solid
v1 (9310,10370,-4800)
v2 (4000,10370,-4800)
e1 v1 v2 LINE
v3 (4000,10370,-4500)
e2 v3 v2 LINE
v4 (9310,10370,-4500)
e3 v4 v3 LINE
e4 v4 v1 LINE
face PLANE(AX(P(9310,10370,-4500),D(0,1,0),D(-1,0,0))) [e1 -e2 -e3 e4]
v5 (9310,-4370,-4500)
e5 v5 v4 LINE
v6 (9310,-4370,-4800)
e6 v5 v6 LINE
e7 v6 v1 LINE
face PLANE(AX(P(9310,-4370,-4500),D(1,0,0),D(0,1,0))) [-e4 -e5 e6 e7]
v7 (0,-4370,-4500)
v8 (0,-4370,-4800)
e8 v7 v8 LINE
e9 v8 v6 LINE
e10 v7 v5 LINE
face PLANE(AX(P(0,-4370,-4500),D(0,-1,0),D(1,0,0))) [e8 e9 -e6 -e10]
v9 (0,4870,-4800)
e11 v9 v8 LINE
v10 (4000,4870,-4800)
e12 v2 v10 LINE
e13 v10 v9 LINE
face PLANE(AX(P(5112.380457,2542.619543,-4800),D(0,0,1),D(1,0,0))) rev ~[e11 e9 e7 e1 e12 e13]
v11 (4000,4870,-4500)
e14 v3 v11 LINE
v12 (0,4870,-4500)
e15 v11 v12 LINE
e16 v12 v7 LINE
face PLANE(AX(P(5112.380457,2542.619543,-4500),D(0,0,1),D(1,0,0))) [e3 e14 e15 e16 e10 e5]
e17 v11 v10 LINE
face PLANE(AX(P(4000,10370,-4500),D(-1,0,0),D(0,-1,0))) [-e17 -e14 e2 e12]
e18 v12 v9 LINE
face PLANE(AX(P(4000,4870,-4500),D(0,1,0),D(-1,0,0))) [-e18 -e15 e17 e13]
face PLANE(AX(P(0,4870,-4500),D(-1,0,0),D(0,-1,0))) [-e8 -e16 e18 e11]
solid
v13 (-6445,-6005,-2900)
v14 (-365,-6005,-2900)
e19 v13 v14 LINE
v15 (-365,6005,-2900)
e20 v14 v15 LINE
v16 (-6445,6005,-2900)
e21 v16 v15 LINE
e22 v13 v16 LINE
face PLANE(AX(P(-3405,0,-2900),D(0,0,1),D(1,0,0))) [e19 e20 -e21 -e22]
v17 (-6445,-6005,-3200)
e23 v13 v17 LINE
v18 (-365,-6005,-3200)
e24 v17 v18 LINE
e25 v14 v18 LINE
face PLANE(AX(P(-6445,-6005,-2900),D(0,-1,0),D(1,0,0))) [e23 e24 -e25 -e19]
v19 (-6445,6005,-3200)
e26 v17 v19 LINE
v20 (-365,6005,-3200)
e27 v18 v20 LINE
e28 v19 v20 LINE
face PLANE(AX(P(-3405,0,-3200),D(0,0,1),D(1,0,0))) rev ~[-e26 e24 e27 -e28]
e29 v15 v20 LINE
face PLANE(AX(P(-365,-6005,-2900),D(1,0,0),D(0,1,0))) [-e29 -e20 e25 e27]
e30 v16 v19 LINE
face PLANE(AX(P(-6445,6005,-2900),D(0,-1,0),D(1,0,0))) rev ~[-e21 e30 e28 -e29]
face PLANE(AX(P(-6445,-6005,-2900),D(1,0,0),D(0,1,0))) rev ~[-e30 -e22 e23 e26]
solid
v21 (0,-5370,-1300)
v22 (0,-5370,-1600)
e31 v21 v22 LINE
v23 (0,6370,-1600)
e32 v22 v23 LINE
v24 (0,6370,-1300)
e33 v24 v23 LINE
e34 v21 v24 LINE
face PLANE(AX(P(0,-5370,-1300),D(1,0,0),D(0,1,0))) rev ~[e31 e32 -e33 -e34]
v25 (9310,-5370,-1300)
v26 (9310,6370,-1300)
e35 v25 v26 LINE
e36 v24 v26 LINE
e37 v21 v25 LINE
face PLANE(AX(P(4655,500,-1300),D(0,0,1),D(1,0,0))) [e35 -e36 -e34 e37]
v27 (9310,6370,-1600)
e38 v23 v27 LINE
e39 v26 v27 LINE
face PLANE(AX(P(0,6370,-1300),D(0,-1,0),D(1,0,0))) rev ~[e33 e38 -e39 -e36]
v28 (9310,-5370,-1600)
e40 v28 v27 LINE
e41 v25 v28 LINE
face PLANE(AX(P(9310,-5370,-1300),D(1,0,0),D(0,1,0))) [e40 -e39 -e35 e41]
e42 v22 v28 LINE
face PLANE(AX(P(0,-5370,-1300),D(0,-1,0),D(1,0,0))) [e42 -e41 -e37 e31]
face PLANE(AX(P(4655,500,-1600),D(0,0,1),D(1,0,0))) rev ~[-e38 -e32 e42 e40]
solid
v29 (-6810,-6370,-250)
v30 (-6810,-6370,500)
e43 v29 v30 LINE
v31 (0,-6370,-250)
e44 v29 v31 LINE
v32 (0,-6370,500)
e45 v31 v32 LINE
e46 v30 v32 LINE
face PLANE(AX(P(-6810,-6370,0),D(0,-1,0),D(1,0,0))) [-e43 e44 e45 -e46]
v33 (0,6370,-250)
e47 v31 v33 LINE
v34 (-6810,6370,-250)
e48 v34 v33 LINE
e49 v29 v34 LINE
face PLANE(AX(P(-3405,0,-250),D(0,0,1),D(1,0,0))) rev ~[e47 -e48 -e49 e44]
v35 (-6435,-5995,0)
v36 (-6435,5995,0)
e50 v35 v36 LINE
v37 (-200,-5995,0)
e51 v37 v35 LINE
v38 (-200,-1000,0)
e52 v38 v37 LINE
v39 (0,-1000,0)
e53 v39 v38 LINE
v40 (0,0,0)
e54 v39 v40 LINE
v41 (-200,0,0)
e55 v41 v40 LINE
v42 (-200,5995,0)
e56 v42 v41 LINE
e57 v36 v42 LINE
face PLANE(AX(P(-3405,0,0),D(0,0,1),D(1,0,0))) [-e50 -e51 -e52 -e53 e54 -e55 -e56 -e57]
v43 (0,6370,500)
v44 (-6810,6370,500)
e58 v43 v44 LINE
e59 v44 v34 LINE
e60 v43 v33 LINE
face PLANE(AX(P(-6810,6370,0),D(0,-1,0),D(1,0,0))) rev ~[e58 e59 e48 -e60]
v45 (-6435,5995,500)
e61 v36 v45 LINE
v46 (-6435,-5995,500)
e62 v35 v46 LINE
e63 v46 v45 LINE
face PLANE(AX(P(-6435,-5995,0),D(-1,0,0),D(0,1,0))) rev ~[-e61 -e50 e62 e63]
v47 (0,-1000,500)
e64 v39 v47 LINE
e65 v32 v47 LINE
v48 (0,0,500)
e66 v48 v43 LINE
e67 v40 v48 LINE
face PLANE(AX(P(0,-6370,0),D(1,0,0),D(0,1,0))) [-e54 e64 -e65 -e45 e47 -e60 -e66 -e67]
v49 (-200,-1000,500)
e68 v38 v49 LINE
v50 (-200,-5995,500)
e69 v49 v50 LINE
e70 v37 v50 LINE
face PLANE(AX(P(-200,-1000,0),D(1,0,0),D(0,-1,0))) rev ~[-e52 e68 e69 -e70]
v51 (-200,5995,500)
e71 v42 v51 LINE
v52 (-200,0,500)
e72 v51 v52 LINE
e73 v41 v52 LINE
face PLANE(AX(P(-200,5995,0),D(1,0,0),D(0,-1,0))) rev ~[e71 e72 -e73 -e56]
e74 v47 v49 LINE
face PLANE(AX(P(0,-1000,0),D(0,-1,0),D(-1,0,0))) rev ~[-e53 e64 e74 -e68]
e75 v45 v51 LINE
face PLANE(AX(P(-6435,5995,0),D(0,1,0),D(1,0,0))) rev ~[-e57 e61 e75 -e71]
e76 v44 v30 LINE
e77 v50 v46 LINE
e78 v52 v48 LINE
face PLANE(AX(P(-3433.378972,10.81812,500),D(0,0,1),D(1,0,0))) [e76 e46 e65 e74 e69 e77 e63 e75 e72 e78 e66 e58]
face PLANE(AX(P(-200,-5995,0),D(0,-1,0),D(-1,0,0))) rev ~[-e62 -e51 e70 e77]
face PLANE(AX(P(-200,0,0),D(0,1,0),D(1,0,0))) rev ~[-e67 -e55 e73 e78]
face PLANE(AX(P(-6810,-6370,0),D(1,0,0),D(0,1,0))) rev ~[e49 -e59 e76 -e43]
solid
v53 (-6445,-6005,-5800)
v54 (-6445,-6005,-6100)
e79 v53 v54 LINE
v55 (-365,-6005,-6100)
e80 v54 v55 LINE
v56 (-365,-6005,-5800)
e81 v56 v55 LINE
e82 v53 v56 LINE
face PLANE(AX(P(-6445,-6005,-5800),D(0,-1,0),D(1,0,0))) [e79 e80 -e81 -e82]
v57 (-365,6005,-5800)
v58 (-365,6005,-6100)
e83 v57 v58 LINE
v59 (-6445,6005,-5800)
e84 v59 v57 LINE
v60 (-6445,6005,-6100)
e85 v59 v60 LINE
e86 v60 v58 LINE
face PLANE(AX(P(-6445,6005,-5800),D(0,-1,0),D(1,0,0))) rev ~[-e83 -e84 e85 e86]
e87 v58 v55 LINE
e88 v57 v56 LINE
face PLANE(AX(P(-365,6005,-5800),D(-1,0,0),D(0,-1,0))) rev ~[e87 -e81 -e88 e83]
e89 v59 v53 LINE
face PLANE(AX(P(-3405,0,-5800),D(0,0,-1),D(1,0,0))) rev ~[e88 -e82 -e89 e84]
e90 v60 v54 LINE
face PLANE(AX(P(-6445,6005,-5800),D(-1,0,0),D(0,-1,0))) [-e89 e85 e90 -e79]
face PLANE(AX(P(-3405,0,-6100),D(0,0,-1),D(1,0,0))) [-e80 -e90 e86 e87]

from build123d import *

# Parameters (mm, degrees)
F1_DEPTH  = 500
F2_W      = 6810
F2_H      = 12740
F3_DEPTH  = 250
F6_W      = 6080
F6_H      = 12010
F7_DEPTH  = 300
F9_W      = 6080
F9_H      = 12010
F10_DEPTH = 300
F13_DEPTH = 300
F15_W     = 9310
F15_H     = 11740
F16_DEPTH = 300


# Not quite as in the source:
# - a feature names something its author has since deleted; it is built from what else it names


with BuildPart() as f1:
    # F0 (on Top) → F1 (new body)
    with BuildSketch(Plane.XY):
        Polygon((0, 0), (0, 6370), (-6810, 6370), (-6810, -6370), (0, -6370), (0, -1000), (-200, -1000), (-200, -5995), (-6435, -5995), (-6435, 5995), (-200, 5995), (-200, 0), align=None)
    extrude(amount=F1_DEPTH)

    # F2 (on Top) → F3 (join)
    with BuildSketch(Plane.XY):
        with Locations((-3405, 0)):
            Rectangle(F2_W, F2_H)
    extrude(amount=-F3_DEPTH)


with BuildPart() as f7:
    # F6 (on offset) → F7 (new body)
    with BuildSketch(Plane.XY.offset(-2900)):
        with Locations((-3405, 0)):
            Rectangle(F6_W, F6_H)
    extrude(amount=-F7_DEPTH)


with BuildPart() as f10:
    # F9 (on offset) → F10 (new body)
    with BuildSketch(Plane(origin=(0, 0, -5800), x_dir=(1, 0, 0), z_dir=(0, 0, -1))):
        with Locations((-3405, 0)):
            Rectangle(F9_W, F9_H)
    extrude(amount=F10_DEPTH)


with BuildPart() as f13:
    # F12 (on offset) → F13 (new body)
    with BuildSketch(Plane.XY.offset(-4500)):
        Polygon((4000, 4870), (0, 4870), (0, -4370), (9310, -4370), (9310, 10370), (4000, 10370), align=None)
    extrude(amount=-F13_DEPTH)


with BuildPart() as f16:
    # F15 (on offset) → F16 (new body)
    with BuildSketch(Plane.XY.offset(-1300)):
        with Locations((4655, 500)):
            Rectangle(F15_W, F15_H)
    extrude(amount=-F16_DEPTH)


solid = Compound([f1.part, f7.part, f10.part, f13.part, f16.part])
